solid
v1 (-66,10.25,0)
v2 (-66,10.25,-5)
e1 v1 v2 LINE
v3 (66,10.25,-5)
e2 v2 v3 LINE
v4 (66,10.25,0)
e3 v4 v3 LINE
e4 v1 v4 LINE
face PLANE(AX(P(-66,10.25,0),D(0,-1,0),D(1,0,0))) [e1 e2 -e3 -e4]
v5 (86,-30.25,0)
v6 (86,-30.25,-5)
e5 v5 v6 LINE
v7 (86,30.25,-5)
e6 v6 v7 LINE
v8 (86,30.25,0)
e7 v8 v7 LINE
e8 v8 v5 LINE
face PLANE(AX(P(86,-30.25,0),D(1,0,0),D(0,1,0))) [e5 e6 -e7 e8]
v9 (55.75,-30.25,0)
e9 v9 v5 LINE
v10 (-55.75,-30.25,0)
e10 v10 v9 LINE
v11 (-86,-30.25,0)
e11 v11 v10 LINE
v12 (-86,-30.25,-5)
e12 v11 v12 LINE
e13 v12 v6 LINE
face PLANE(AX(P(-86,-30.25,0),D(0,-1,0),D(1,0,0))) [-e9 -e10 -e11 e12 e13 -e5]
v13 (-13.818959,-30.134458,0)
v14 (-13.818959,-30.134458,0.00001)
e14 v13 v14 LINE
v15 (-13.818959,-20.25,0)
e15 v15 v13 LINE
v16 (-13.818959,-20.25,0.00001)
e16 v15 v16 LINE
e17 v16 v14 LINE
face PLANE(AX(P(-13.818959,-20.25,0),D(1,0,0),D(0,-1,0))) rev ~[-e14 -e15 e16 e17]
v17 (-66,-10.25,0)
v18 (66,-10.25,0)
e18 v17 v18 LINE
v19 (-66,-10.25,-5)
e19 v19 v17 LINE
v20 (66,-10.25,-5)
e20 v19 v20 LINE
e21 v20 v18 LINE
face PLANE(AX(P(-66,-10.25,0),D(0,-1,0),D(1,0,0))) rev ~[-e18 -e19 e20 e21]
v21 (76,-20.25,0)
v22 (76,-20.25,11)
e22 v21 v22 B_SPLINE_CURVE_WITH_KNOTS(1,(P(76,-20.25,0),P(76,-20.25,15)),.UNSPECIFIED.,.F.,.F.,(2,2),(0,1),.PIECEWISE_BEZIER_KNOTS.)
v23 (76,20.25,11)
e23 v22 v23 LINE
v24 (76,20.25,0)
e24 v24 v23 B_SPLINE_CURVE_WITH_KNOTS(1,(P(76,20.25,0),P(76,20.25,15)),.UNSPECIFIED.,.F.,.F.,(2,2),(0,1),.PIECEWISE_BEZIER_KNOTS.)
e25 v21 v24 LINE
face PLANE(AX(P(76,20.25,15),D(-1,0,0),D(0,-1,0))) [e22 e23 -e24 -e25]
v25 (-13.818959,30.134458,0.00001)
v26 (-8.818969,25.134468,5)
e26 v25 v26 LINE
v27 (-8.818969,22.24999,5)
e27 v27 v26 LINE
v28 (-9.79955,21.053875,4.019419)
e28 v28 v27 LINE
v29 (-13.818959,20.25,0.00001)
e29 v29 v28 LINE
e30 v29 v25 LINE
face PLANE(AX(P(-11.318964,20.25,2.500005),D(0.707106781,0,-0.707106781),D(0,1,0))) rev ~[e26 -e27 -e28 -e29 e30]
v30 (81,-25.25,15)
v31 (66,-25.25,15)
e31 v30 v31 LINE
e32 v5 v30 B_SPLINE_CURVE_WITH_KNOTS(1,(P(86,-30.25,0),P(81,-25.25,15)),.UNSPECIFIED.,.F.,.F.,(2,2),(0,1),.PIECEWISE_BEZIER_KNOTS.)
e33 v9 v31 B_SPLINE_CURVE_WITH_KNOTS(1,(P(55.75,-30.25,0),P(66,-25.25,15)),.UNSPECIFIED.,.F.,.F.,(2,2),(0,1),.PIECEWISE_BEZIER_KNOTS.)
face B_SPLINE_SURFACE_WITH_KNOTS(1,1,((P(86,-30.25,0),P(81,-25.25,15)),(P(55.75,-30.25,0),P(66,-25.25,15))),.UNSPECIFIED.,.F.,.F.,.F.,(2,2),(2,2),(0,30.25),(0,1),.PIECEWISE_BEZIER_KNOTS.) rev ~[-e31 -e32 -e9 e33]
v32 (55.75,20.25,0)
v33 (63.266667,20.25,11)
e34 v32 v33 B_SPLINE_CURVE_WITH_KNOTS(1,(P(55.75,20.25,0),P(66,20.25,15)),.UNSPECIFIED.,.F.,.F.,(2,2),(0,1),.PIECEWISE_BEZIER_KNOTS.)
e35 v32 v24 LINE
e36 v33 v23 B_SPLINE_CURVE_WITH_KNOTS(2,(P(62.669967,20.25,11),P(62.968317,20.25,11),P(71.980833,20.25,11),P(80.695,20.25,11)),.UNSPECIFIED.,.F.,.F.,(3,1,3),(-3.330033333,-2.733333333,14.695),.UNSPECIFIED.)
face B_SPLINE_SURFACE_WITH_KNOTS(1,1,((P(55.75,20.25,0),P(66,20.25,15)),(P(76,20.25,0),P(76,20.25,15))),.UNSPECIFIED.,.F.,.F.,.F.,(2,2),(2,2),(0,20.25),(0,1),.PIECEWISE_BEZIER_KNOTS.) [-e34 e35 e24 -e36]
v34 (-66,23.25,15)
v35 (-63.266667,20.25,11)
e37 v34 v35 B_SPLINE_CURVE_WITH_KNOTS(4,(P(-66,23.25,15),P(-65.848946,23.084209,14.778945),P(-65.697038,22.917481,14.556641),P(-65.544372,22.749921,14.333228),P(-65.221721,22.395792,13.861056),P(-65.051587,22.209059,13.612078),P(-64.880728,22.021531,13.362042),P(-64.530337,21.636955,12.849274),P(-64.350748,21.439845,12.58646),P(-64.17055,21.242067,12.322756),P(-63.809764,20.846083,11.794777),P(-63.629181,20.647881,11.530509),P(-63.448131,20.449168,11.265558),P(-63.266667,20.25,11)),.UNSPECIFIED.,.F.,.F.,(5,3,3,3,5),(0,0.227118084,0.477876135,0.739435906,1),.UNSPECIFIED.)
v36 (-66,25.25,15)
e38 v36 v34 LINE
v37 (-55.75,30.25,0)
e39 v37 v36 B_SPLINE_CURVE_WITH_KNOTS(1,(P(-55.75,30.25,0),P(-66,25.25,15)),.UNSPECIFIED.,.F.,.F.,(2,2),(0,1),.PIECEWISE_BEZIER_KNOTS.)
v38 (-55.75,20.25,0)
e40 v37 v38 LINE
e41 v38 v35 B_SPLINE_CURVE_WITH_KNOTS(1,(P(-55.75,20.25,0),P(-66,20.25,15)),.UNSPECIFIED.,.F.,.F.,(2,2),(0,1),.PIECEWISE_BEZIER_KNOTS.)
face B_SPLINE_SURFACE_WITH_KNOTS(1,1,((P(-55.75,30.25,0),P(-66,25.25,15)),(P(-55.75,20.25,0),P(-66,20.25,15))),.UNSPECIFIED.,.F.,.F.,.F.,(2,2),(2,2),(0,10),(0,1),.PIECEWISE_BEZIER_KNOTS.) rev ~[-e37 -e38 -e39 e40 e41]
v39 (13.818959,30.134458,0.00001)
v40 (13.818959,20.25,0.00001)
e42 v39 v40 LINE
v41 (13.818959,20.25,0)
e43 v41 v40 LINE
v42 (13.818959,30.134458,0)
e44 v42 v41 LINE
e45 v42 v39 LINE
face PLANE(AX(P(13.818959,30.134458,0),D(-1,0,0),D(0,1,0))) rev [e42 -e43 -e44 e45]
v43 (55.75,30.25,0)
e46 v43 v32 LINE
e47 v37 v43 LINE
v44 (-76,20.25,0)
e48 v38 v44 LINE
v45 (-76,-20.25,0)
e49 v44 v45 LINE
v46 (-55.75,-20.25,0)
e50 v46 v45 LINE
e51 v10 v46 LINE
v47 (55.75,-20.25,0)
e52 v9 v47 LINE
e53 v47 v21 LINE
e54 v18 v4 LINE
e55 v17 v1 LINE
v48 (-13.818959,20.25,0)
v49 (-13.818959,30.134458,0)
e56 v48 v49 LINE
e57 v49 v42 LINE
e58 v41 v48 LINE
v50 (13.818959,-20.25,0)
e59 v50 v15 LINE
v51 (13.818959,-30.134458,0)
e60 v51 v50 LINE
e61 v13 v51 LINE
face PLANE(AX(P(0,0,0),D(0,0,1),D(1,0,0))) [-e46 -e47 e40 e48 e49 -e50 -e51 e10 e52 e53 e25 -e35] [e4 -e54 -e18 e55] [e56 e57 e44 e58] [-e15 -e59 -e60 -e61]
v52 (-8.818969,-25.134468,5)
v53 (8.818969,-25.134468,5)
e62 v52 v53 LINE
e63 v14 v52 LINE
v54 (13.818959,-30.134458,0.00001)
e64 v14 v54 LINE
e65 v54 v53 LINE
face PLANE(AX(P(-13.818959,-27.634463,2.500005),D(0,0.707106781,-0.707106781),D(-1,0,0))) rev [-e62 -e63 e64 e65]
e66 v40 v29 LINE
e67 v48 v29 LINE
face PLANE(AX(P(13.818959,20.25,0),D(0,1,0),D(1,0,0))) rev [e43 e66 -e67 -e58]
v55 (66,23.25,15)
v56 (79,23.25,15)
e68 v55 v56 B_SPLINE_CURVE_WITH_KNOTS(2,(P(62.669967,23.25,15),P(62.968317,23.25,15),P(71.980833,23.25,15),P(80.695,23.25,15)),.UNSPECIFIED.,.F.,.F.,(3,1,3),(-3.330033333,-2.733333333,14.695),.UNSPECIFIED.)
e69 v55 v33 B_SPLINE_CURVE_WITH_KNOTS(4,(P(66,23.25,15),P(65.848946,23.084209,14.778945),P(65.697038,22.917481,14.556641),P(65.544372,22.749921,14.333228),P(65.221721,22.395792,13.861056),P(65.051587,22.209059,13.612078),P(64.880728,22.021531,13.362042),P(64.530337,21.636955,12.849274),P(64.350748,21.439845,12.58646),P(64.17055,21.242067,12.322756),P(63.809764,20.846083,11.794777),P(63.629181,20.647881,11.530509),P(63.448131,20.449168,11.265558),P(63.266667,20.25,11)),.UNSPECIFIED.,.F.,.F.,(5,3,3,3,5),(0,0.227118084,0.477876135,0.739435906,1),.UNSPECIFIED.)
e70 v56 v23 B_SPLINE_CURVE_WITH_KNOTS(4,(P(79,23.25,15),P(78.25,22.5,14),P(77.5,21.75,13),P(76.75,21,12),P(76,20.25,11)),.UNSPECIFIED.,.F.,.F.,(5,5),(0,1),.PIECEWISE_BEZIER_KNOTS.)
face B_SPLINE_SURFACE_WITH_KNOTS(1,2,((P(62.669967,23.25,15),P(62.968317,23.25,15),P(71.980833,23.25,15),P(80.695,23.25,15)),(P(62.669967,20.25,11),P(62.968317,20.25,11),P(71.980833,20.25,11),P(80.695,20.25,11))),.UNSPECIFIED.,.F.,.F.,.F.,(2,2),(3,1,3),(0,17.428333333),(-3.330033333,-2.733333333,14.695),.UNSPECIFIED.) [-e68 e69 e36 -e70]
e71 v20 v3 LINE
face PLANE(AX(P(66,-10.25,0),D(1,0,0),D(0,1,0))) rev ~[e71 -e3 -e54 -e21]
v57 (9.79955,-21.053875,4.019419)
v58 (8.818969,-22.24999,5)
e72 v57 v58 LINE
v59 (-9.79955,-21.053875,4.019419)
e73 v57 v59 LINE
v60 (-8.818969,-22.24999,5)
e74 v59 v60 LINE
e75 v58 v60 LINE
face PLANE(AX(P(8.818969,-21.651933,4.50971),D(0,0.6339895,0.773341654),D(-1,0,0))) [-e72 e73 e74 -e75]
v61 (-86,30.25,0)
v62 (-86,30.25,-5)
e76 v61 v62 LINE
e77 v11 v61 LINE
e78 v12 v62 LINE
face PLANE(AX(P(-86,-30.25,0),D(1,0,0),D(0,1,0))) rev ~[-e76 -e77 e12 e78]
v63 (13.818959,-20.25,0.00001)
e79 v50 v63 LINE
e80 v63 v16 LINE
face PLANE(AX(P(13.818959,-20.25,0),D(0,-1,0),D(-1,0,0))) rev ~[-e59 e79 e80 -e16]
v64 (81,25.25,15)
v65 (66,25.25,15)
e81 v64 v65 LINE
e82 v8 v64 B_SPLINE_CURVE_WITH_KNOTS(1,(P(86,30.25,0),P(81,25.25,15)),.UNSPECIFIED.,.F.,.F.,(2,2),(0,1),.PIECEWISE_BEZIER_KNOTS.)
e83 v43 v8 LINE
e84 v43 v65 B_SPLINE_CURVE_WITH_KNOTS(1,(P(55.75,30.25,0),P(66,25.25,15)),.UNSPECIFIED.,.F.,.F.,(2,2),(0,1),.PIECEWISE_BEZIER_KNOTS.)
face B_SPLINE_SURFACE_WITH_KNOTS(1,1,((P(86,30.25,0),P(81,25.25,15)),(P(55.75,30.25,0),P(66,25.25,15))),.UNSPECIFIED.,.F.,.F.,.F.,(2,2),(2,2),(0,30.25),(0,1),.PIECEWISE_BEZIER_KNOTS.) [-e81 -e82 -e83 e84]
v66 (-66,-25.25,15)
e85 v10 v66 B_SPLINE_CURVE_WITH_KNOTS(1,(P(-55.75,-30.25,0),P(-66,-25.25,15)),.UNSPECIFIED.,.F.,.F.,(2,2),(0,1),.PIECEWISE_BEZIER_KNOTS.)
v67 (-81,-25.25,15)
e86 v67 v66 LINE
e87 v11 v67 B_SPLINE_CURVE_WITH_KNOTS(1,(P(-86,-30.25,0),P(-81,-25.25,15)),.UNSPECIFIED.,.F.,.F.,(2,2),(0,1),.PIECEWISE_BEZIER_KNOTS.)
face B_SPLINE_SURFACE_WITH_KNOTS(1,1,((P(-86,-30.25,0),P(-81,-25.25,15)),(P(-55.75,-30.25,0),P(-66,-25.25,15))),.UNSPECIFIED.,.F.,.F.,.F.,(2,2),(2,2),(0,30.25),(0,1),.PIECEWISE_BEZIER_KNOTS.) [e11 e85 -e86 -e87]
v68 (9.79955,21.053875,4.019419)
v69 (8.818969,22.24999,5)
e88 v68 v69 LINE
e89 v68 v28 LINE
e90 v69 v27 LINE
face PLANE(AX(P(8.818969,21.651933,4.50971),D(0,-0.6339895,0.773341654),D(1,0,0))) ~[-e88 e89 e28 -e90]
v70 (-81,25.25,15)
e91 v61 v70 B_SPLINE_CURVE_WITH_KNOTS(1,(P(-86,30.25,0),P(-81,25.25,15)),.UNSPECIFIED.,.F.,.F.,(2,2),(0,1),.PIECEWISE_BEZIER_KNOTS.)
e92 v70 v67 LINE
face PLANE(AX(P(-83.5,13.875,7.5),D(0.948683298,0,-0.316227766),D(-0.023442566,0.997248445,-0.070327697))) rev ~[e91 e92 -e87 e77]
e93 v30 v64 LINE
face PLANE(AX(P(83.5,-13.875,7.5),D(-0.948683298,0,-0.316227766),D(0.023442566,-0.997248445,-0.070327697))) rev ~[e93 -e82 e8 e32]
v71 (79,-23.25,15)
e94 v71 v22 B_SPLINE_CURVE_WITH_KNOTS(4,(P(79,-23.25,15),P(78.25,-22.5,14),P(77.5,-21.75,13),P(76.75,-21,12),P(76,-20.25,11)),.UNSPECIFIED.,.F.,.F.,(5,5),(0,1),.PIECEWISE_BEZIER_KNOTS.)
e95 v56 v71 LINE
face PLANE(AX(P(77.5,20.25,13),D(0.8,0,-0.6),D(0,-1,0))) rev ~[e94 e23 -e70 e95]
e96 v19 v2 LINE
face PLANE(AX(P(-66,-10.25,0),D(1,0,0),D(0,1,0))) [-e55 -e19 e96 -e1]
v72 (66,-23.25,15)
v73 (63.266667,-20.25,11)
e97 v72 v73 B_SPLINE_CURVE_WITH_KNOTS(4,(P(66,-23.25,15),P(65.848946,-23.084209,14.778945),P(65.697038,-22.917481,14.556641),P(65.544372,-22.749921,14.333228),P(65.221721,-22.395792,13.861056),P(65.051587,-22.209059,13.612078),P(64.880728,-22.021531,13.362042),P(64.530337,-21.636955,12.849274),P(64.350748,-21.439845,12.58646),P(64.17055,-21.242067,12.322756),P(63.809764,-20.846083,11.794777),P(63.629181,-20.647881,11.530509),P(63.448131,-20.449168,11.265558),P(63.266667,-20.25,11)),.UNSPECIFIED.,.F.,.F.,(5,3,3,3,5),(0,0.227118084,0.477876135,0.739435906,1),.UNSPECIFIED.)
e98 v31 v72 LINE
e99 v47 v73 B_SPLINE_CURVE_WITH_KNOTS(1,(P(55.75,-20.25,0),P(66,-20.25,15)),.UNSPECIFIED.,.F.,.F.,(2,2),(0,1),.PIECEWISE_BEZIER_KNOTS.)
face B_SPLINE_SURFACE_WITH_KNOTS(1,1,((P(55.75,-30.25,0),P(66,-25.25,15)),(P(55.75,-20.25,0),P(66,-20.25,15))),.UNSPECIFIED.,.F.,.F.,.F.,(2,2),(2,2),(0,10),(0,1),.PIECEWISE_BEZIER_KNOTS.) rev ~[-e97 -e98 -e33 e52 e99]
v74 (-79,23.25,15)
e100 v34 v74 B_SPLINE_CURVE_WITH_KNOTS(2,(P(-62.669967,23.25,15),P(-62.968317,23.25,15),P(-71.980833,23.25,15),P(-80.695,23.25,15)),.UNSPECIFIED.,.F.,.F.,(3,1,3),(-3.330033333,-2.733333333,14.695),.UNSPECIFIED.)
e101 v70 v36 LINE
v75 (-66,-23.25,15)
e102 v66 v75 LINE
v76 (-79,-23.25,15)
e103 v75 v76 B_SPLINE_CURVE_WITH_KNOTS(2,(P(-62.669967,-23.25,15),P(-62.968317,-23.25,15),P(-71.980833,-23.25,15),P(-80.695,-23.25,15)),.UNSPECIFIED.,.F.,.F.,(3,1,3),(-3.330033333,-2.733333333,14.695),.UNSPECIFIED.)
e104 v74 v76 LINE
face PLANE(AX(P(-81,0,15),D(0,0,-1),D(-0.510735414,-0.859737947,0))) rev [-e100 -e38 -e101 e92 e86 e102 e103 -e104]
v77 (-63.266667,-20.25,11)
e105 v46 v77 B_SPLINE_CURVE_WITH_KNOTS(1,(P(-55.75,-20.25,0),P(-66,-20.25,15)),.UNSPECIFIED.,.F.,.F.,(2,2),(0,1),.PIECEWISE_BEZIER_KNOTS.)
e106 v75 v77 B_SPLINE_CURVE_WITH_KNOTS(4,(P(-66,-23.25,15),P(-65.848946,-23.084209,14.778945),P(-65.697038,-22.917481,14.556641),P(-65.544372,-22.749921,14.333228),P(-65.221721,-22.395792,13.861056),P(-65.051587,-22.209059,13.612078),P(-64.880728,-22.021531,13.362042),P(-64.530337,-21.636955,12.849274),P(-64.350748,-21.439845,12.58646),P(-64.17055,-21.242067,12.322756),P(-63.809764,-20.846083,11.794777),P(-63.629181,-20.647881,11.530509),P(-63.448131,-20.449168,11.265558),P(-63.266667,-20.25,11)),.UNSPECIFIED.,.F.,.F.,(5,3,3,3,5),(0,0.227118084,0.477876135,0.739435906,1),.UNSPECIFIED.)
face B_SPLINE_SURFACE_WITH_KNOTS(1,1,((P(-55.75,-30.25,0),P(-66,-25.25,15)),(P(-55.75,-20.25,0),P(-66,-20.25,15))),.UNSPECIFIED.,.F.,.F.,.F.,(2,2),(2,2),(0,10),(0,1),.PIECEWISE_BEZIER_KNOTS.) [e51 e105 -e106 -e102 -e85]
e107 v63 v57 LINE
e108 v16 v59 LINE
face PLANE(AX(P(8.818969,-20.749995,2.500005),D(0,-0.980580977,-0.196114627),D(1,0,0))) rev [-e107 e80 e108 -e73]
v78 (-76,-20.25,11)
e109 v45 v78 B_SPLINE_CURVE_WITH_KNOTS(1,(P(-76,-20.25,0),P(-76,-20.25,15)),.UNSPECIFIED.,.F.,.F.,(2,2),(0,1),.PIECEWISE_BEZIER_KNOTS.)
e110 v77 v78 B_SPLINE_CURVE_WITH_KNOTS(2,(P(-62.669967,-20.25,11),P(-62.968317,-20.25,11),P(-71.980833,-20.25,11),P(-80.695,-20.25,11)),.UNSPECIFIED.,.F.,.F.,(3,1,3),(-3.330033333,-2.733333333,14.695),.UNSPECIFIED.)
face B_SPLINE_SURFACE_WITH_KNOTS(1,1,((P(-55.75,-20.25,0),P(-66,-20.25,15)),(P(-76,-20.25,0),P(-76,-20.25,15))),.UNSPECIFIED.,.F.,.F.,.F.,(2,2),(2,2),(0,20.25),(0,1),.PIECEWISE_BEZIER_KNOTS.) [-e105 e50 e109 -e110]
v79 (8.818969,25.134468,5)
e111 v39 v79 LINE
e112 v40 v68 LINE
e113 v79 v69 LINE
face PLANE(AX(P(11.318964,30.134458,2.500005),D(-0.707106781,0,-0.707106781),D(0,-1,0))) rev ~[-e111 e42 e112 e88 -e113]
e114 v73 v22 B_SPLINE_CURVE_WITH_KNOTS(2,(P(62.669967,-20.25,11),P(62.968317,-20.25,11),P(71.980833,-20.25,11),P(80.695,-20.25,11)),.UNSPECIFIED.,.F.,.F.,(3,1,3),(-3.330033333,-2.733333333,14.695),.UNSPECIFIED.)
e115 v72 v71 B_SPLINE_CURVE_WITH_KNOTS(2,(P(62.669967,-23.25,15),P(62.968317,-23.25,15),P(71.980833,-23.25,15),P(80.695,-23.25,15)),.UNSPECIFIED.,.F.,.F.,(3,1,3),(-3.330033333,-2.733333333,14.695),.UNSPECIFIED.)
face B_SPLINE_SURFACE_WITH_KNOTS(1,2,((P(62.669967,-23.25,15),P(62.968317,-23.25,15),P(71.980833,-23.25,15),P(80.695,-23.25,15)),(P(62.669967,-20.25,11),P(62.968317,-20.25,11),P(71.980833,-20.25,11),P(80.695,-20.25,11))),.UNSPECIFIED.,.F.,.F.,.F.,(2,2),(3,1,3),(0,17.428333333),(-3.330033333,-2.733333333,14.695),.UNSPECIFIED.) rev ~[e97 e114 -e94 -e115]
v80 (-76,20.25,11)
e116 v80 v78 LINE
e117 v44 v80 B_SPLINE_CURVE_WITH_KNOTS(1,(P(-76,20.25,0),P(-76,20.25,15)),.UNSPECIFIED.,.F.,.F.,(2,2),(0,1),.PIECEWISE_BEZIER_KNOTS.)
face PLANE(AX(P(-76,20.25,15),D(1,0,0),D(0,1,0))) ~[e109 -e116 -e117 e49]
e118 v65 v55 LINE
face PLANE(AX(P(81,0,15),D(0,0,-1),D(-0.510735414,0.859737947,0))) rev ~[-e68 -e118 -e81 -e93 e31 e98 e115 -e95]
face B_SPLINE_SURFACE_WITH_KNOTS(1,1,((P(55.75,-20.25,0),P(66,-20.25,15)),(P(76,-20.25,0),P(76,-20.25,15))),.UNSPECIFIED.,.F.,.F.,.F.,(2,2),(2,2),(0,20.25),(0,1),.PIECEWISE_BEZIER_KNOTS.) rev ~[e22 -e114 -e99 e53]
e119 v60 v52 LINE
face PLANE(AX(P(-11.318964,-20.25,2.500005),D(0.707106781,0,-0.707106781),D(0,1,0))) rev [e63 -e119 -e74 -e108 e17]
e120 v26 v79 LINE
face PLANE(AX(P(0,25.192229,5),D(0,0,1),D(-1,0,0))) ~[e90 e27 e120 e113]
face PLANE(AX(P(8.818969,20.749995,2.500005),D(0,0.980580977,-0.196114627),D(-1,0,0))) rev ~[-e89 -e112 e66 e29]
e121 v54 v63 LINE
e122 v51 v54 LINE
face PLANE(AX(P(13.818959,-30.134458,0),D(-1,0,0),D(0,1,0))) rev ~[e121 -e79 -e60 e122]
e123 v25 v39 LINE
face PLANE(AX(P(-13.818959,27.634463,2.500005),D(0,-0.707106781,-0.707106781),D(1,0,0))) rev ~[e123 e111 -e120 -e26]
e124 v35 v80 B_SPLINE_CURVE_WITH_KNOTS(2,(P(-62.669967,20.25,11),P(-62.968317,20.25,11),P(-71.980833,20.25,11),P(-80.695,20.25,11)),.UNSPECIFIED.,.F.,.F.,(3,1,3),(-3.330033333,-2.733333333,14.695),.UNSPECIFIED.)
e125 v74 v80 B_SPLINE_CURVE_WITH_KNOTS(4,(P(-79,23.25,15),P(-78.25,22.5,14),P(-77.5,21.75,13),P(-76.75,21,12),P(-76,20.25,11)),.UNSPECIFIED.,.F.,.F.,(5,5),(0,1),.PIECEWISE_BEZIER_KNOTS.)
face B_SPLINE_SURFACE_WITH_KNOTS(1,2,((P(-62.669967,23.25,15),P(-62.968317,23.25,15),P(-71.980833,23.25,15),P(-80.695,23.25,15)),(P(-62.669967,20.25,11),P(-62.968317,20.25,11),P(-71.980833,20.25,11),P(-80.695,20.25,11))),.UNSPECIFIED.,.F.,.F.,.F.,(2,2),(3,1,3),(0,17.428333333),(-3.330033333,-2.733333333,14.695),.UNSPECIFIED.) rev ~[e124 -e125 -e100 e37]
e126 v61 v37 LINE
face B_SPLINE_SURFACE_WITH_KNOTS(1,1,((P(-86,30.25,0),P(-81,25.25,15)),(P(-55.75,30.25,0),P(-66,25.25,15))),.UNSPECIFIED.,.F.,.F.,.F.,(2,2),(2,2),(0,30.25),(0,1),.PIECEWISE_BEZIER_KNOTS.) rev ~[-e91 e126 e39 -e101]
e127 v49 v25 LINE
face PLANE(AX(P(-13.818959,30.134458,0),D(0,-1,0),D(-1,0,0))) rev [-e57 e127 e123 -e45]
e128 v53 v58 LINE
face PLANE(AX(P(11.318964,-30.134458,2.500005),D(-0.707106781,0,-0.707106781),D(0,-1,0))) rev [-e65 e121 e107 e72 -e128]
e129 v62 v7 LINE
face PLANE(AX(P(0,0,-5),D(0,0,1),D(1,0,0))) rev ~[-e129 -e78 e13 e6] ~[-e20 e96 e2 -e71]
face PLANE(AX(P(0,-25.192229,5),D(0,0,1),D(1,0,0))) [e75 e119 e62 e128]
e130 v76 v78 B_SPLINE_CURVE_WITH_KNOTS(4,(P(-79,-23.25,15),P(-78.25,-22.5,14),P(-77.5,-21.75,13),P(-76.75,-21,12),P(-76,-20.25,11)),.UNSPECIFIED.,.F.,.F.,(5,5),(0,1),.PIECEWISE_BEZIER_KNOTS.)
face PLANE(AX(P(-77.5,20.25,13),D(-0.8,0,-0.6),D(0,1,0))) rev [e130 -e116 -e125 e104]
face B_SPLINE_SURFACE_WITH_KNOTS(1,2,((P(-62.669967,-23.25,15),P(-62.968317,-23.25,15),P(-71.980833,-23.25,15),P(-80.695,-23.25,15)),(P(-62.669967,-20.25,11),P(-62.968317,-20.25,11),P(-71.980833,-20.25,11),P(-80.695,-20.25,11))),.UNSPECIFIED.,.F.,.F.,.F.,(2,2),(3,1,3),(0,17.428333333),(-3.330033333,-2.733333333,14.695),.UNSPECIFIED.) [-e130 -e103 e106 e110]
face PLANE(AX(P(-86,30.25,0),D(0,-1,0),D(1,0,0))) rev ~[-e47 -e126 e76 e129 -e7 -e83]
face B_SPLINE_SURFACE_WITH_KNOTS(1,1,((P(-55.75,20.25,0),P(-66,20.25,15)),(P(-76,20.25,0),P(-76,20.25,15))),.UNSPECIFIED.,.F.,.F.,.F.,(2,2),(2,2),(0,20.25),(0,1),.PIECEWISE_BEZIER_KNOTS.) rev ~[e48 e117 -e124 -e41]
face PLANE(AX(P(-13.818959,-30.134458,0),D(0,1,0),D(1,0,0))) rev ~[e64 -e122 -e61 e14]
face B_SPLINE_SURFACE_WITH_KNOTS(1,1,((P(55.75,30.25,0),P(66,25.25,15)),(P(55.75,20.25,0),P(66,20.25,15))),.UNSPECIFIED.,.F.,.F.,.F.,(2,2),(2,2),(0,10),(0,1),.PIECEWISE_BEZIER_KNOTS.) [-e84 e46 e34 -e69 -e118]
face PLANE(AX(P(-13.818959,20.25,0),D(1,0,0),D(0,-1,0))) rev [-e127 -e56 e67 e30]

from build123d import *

# Parameters (mm, degrees)
F0_W      = 172
F0_H      = 60.5
F4_DEPTH  = 5
F6_SIZE2  = 4
F6_SIZE   = 3
F9_DEPTH  = 5
F10_SIZE  = 4.99999
F11_SIZE2 = 0.99999
F11_SIZE  = 4.99999
F12_SIZE  = 1
F14_W     = 132
F14_H     = 20.5
F15_DEPTH = 12.5


# Not quite as in the source:
# - a fillet or chamfer is up to 0.001 mm smaller than in the source, because OpenCascade refuses the exact size


with BuildPart() as f4:
    # F0 (on Top) → F4 (new body)
    with BuildSketch(Plane.XY):
        Rectangle(F0_W, F0_H)
    extrude(amount=-F4_DEPTH)

    # F3 (on Top) → F5 section 0
    with BuildSketch(Plane.XY):
        Polygon((-86, 0), (-86, -30.25), (-55.75, -30.25), (-55.75, -20.25), (-76, -20.25), (-76, 0), align=None)
    # F2 (on offset) → F5 section 1
    with BuildSketch(Plane.XY.offset(15)):
        Polygon((-76, -20.25), (-76, 0), (-81, 0), (-81, -25.25), (-66, -25.25), (-66, -20.25), align=None)
    loft()

    # F6
    f6_edges = [f4.edges().sort_by_distance(p)[0] for p in [
        (-76, -10.125, 15),
        (-71, -20.25, 15),
    ]]
    chamfer(f6_edges, length=F6_SIZE, length2=F6_SIZE2)

    # F7: F4 across plane


with BuildPart() as f4_1:
    add(f4.part)
    add(f4.part.mirror(Plane.YZ))

    # F8 (on face) → F9 (join)
    with BuildSketch(Plane.XY):
        Polygon((13.8189587742, -20.25), (0, -20.25), (-13.8189587742, -20.25), (-13.8189587742, -30.1344580948), (0, -30.1344580948), (13.8189587742, -30.1344580948), align=None)
    extrude(amount=F9_DEPTH)

    # F10 (size 5 in the source; OpenCascade refuses exactly that, so slightly less here)
    f10_edges = [f4_1.edges().sort_by_distance(p)[0] for p in [
        (13.818959, -25.192229, 5),
        (0, -30.134458, 5),
        (-13.818959, -25.192229, 5),
    ]]
    chamfer(f10_edges, length=F10_SIZE)

    # F11 (size 5 and 1 in the source; OpenCascade refuses exactly that, so slightly less here)
    f11_edges = [f4_1.edges().sort_by_distance(p)[0] for p in [
        (0, -20.25, 5),
    ]]
    f11_side = f4_1.faces().sort_by_distance((0, -20.25, 2.315943))[0]
    chamfer(f11_edges, length=F11_SIZE, length2=F11_SIZE2, reference=f11_side)

    # F12
    f12_edges = [f4_1.edges().sort_by_distance(p)[0] for p in [
        (0, -21.24999, 5),
    ]]
    chamfer(f12_edges, length=F12_SIZE)

    # F13: F4 across plane


with BuildPart() as f4_2:
    add(f4_1.part)
    add(f4_1.part.mirror(Plane.XZ))

    # F14 (on Top) → F15 (cut, symmetric)
    with BuildSketch(Plane.XY):
        Rectangle(F14_W, F14_H)
    extrude(amount=F15_DEPTH, both=True, mode=Mode.SUBTRACT)


solid = f4_2.part
